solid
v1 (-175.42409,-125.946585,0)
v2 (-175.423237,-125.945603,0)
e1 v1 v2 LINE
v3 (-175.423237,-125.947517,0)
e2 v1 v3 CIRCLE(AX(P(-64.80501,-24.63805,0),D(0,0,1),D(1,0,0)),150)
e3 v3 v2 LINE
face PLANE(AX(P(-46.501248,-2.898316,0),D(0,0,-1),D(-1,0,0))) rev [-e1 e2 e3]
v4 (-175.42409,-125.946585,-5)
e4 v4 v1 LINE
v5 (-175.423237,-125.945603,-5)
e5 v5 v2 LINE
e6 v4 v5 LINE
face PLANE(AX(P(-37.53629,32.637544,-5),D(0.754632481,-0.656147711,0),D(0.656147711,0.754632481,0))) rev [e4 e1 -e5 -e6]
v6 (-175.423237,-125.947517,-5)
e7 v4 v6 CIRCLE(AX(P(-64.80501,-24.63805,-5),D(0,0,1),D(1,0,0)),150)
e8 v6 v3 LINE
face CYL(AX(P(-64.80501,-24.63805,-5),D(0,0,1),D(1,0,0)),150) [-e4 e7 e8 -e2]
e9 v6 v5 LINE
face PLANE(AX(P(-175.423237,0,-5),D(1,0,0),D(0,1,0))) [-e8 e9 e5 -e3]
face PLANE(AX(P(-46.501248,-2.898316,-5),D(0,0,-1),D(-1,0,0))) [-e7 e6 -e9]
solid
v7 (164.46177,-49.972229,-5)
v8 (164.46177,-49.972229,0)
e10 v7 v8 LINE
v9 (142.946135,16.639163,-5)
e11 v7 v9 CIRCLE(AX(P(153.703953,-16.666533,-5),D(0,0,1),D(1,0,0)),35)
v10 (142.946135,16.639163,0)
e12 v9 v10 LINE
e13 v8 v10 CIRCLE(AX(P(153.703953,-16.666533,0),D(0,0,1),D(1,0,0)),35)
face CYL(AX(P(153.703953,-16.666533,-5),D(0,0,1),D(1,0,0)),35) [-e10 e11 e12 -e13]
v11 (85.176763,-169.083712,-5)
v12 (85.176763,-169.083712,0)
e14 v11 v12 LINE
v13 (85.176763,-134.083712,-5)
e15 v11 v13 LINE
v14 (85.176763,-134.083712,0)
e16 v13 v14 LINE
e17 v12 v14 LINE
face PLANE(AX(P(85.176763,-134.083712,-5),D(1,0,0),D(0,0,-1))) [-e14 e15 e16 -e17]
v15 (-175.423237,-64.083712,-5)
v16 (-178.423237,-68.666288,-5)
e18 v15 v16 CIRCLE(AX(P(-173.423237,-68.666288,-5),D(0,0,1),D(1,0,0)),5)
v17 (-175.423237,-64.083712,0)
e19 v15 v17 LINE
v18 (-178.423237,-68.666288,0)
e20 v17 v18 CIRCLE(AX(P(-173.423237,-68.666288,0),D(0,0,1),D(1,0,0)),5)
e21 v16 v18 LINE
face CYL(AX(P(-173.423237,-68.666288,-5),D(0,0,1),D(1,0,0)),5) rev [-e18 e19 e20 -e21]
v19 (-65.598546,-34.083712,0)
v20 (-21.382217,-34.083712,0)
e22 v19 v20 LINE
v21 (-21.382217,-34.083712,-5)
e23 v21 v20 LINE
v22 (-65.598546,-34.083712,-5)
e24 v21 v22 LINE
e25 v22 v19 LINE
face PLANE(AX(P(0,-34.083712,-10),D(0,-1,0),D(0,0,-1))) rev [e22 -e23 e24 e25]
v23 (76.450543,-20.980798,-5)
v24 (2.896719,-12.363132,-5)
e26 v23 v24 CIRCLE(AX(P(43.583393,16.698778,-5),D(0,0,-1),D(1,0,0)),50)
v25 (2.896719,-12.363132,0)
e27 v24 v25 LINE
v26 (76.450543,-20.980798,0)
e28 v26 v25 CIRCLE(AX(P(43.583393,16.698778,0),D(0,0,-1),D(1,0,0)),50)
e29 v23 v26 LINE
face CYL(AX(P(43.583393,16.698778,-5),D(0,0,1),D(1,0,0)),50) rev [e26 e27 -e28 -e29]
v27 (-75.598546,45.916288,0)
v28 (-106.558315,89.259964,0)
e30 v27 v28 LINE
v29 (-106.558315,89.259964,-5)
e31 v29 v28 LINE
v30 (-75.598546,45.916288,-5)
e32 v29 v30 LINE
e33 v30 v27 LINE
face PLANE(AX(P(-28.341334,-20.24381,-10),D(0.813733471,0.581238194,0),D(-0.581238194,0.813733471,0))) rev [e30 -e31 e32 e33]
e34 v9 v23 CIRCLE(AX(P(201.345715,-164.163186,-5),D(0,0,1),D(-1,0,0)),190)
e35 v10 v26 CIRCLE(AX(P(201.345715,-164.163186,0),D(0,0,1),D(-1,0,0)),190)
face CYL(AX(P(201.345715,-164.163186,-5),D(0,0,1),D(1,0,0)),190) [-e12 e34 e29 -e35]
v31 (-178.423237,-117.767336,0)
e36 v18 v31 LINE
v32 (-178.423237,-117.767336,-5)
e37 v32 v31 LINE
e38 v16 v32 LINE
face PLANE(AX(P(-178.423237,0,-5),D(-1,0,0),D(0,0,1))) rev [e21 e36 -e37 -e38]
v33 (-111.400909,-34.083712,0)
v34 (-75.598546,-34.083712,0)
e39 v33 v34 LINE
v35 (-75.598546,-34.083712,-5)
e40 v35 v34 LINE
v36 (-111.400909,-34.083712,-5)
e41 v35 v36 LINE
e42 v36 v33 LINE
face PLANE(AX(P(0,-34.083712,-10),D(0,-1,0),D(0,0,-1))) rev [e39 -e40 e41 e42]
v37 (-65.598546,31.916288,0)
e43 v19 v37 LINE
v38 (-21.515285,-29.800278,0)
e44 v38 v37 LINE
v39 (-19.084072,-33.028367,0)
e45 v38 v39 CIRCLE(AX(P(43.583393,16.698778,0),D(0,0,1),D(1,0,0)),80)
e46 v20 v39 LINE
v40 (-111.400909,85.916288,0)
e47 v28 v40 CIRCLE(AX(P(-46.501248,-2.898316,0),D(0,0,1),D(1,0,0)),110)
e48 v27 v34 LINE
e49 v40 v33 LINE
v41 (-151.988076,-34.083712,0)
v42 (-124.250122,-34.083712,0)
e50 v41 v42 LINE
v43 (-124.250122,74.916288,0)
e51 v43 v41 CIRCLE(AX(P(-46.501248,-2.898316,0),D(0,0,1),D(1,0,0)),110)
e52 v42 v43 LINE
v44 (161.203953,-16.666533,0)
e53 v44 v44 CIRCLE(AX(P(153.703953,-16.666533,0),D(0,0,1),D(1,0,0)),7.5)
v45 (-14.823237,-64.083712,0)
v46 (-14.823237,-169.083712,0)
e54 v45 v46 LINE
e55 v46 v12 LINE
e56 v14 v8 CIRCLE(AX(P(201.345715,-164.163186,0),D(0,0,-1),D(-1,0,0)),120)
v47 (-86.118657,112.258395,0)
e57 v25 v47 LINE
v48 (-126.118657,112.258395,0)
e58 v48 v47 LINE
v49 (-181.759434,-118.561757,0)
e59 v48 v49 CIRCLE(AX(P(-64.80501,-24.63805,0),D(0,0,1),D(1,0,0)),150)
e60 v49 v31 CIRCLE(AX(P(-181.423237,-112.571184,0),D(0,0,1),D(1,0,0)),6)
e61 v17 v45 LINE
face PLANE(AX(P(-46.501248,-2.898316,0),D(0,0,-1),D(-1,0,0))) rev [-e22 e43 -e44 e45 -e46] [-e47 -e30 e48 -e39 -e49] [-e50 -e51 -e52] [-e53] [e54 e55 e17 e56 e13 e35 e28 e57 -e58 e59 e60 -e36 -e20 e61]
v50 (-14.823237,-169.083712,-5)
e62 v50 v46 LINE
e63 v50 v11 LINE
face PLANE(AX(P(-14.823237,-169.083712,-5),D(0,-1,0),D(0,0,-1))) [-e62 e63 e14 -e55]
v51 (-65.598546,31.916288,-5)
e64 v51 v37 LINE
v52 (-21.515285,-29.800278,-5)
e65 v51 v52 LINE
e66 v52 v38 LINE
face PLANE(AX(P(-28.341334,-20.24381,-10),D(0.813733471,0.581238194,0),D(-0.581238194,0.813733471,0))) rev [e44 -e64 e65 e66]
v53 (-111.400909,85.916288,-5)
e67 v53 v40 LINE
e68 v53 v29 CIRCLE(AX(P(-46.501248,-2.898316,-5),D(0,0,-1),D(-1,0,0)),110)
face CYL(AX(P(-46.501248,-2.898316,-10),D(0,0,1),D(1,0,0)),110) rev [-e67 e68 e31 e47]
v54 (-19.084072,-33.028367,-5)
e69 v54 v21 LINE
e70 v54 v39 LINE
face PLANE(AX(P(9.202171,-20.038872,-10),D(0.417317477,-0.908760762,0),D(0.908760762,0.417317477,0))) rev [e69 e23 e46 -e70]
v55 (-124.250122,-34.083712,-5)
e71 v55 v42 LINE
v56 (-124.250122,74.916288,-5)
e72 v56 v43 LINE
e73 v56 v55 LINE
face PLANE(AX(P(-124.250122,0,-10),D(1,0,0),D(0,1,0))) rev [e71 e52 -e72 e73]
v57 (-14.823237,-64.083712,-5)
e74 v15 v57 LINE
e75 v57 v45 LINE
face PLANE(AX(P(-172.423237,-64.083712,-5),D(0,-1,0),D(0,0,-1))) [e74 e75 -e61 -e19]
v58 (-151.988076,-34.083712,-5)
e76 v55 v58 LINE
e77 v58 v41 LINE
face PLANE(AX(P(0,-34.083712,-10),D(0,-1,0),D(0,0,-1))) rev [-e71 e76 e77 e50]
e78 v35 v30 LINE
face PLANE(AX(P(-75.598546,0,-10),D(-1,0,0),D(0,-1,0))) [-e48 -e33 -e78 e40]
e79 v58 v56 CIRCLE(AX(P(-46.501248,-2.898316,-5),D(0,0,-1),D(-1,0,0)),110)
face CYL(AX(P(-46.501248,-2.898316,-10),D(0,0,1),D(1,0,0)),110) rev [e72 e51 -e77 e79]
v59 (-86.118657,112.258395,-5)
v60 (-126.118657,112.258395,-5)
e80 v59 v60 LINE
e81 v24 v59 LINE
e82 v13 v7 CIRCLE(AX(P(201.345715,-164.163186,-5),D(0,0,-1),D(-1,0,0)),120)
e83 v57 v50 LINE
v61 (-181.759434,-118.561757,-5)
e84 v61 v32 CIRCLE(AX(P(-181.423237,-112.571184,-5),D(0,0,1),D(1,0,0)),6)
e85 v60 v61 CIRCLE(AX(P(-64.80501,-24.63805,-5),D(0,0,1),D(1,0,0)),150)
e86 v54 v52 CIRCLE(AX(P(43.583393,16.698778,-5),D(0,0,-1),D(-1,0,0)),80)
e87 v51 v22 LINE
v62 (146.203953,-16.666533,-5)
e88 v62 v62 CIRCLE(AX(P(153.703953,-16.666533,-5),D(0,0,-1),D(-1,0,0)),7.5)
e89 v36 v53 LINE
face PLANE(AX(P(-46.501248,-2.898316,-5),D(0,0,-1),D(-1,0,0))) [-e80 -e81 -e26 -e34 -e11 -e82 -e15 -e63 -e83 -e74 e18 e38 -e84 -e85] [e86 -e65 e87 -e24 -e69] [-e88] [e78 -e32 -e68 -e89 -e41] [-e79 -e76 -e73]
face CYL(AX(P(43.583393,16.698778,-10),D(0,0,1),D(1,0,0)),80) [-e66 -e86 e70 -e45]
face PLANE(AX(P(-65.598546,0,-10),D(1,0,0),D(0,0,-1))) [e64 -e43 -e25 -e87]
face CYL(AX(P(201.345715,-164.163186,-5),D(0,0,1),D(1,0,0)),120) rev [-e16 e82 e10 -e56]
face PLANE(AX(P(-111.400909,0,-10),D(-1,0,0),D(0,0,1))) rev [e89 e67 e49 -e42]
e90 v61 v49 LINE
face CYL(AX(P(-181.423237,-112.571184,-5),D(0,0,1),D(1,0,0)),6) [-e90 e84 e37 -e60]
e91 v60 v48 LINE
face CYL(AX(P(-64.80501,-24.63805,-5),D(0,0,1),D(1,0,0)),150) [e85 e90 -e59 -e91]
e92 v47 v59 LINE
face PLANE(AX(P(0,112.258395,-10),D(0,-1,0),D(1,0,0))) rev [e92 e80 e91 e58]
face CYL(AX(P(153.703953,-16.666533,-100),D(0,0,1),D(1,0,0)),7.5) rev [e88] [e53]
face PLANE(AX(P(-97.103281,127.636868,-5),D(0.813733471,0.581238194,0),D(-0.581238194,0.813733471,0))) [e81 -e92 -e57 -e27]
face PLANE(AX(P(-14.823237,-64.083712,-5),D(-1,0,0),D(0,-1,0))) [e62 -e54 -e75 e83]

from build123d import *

# Parameters (mm, degrees)
BASE_FLANGE1_DEPTH  = 5
CUT_EXTRUDE1_DEPTH  = 10
CUT_EXTRUDE2_DEPTH  = 10
BOSS_EXTRUDE1_DEPTH = 5
CUT_EXTRUDE3_DEPTH  = 5
CUT_EXTRUDE5_DEPTH  = 5
SKETCH15_W          = 100
SKETCH15_H          = 35
BOSS_EXTRUDE2_DEPTH = 5
SKETCH16_R          = 7.5
CUT_EXTRUDE6_DEPTH  = 100


# Sheet-metal steps are written as plain solids
with BuildPart() as part:
    # Sketch1 → Base-Flange1 (new body)
    with BuildSketch(Plane.XY):
        with BuildLine():
            Line((-172.42323657, -64.083711984), (-14.82323657, -64.083711984))
            Line((-14.82323657, -64.083711984), (-14.82323657, -134.083711984))
            Line((-14.82323657, -134.083711984), (85.17676343, -134.083711984))
            ThreePointArc((85.17676343, -134.083711984), (114.024568083, -81.852692198), (164.46176985, -49.972228916))
            ThreePointArc((164.46176985, -49.972228916), (187.009648293, -5.908715918), (142.946135295, 16.639162525))
            ThreePointArc((142.946135295, 16.639162525), (107.787942262, 1.20592631), (76.450543226, -20.980798078))
            ThreePointArc((76.450543226, -20.980798078), (37.765121816, -32.96154582), (2.896719251, -12.363132081))
            Line((2.896719251, -12.363132081), (-97.103280749, 127.636867919))
            ThreePointArc((-97.103280749, 127.636867919), (-176.806189112, 48.29369713), (-172.42323657, -64.083711984))
        make_face()
    extrude(amount=-BASE_FLANGE1_DEPTH)

    # Sketch6 → Cut-Extrude1 (cut)
    with BuildSketch(Plane.XY):
        with BuildLine():
            Line((-151.988076483, -34.083711984), (-124.250121533, -34.083711984))
            Line((-124.250121533, -34.083711984), (-124.250121533, 74.916288016))
            ThreePointArc((-124.250121533, 74.916288016), (-153.103689858, 24.229516511), (-151.988076483, -34.083711984))
        make_face()
        with BuildLine():
            Line((-111.40090947, -34.083711984), (-75.598546249, -34.083711984))
            Line((-75.598546249, -34.083711984), (-75.598546249, 45.916288016))
            Line((-75.598546249, 45.916288016), (-106.558315083, 89.259964383))
            ThreePointArc((-106.558315083, 89.259964383), (-109.00197636, 87.620515753), (-111.40090947, 85.916288016))
            Line((-111.40090947, 85.916288016), (-111.40090947, -34.083711984))
        make_face()
        with BuildLine():
            Line((-65.598546249, -34.083711984), (-21.382216912, -34.083711984))
            Line((-21.382216912, -34.083711984), (-19.084071622, -33.028366909))
            ThreePointArc((-19.084071622, -33.028366909), (-20.320064907, -31.42967647), (-21.515284886, -29.800277893))
            Line((-21.515284886, -29.800277893), (-65.598546249, 31.916288016))
            Line((-65.598546249, 31.916288016), (-65.598546249, -34.083711984))
        make_face()
    extrude(amount=-CUT_EXTRUDE1_DEPTH, mode=Mode.SUBTRACT)

    # Sketch7 → Cut-Extrude2 (cut)
    with BuildSketch(Plane.XY):
        with BuildLine():
            ThreePointArc((-97.103280749, 127.636867919), (-112.063433166, 120.801319497), (-126.118657218, 112.258394975))
            Line((-126.118657218, 112.258394975), (-86.118657218, 112.258394975))
            Line((-86.118657218, 112.258394975), (-97.103280749, 127.636867919))
        make_face()
    extrude(amount=-CUT_EXTRUDE2_DEPTH, mode=Mode.SUBTRACT)

    # Sketch8 → Boss-Extrude1 (add)
    with BuildSketch(Plane.XY):
        with BuildLine():
            ThreePointArc((-126.118657218, 112.258394975), (-211.691552632, 5.764970244), (-175.42323657, -125.9475166))
            Line((-175.42323657, -125.9475166), (-175.42323657, -64.083711984))
            Line((-175.42323657, -64.083711984), (-172.42323657, -64.083711984))
            ThreePointArc((-172.42323657, -64.083711984), (-181.910795868, 32.658036849), (-126.118657218, 112.258394975))
        make_face()
    extrude(amount=-BOSS_EXTRUDE1_DEPTH)

    # Sketch9 → Cut-Extrude3 (cut)
    with BuildSketch(Plane.XY):
        with BuildLine():
            ThreePointArc((-175.42323657, -64.083711984), (-177.606536703, -65.927674892), (-178.42323657, -68.666287679))
            Line((-178.42323657, -68.666287679), (-178.42323657, -122.571183635))
            ThreePointArc((-178.42323657, -122.571183635), (-176.936364973, -124.270169842), (-175.424090186, -125.946584542))
            Line((-175.424090186, -125.946584542), (-175.42323657, -125.945602803))
            Line((-175.42323657, -125.945602803), (-175.42323657, -64.083711984))
        make_face()
        with BuildLine():
            ThreePointArc((-175.424090186, -125.946584542), (-176.936364973, -124.270169842), (-178.42323657, -122.571183635))
            Line((-178.42323657, -122.571183635), (-178.42323657, -129.395889076))
            Line((-178.42323657, -129.395889076), (-175.424090186, -125.946584542))
        make_face()
    extrude(amount=-CUT_EXTRUDE3_DEPTH, mode=Mode.SUBTRACT)


with BuildPart() as cut_extrude3_piece_1:
    # of the separate pieces the step leaves, piece 1, a body of its own (cut_extrude3_pieces)
    add(part.part.solids().sort_by_distance((-126.118657218, 112.258394975, 0))[0])

    # Sketch14 → Cut-Extrude5 (cut)
    with BuildSketch(Plane.XY):
        with BuildLine():
            ThreePointArc((-178.42323657, -117.767336057), (-181.723623091, -118.563659579), (-184.927830167, -117.441278471))
            Line((-184.927830167, -117.441278471), (-178.42323657, -122.571183635))
            Line((-178.42323657, -122.571183635), (-178.42323657, -117.767336057))
        make_face()
    extrude(amount=-CUT_EXTRUDE5_DEPTH, mode=Mode.SUBTRACT)

    # Sketch15 → Boss-Extrude2 (add)
    with BuildSketch(Plane.XY):
        with Locations((35.17676343, -151.583711984)):
            Rectangle(SKETCH15_W, SKETCH15_H)
    extrude(amount=-BOSS_EXTRUDE2_DEPTH)

    # Sketch16 → Cut-Extrude6 (cut)
    with BuildSketch(Plane.XY):
        with Locations((153.703952572, -16.666533195)):
            Circle(SKETCH16_R)
    extrude(amount=-CUT_EXTRUDE6_DEPTH, mode=Mode.SUBTRACT)


with BuildPart() as cut_extrude3_piece_2:
    # of the separate pieces the step leaves, piece 2, a body of its own (cut_extrude3_pieces)
    add(part.part.solids().sort_by_distance((-175.424090186, -125.946584542, 0))[0])


solid = Compound([cut_extrude3_piece_1.part, cut_extrude3_piece_2.part])
